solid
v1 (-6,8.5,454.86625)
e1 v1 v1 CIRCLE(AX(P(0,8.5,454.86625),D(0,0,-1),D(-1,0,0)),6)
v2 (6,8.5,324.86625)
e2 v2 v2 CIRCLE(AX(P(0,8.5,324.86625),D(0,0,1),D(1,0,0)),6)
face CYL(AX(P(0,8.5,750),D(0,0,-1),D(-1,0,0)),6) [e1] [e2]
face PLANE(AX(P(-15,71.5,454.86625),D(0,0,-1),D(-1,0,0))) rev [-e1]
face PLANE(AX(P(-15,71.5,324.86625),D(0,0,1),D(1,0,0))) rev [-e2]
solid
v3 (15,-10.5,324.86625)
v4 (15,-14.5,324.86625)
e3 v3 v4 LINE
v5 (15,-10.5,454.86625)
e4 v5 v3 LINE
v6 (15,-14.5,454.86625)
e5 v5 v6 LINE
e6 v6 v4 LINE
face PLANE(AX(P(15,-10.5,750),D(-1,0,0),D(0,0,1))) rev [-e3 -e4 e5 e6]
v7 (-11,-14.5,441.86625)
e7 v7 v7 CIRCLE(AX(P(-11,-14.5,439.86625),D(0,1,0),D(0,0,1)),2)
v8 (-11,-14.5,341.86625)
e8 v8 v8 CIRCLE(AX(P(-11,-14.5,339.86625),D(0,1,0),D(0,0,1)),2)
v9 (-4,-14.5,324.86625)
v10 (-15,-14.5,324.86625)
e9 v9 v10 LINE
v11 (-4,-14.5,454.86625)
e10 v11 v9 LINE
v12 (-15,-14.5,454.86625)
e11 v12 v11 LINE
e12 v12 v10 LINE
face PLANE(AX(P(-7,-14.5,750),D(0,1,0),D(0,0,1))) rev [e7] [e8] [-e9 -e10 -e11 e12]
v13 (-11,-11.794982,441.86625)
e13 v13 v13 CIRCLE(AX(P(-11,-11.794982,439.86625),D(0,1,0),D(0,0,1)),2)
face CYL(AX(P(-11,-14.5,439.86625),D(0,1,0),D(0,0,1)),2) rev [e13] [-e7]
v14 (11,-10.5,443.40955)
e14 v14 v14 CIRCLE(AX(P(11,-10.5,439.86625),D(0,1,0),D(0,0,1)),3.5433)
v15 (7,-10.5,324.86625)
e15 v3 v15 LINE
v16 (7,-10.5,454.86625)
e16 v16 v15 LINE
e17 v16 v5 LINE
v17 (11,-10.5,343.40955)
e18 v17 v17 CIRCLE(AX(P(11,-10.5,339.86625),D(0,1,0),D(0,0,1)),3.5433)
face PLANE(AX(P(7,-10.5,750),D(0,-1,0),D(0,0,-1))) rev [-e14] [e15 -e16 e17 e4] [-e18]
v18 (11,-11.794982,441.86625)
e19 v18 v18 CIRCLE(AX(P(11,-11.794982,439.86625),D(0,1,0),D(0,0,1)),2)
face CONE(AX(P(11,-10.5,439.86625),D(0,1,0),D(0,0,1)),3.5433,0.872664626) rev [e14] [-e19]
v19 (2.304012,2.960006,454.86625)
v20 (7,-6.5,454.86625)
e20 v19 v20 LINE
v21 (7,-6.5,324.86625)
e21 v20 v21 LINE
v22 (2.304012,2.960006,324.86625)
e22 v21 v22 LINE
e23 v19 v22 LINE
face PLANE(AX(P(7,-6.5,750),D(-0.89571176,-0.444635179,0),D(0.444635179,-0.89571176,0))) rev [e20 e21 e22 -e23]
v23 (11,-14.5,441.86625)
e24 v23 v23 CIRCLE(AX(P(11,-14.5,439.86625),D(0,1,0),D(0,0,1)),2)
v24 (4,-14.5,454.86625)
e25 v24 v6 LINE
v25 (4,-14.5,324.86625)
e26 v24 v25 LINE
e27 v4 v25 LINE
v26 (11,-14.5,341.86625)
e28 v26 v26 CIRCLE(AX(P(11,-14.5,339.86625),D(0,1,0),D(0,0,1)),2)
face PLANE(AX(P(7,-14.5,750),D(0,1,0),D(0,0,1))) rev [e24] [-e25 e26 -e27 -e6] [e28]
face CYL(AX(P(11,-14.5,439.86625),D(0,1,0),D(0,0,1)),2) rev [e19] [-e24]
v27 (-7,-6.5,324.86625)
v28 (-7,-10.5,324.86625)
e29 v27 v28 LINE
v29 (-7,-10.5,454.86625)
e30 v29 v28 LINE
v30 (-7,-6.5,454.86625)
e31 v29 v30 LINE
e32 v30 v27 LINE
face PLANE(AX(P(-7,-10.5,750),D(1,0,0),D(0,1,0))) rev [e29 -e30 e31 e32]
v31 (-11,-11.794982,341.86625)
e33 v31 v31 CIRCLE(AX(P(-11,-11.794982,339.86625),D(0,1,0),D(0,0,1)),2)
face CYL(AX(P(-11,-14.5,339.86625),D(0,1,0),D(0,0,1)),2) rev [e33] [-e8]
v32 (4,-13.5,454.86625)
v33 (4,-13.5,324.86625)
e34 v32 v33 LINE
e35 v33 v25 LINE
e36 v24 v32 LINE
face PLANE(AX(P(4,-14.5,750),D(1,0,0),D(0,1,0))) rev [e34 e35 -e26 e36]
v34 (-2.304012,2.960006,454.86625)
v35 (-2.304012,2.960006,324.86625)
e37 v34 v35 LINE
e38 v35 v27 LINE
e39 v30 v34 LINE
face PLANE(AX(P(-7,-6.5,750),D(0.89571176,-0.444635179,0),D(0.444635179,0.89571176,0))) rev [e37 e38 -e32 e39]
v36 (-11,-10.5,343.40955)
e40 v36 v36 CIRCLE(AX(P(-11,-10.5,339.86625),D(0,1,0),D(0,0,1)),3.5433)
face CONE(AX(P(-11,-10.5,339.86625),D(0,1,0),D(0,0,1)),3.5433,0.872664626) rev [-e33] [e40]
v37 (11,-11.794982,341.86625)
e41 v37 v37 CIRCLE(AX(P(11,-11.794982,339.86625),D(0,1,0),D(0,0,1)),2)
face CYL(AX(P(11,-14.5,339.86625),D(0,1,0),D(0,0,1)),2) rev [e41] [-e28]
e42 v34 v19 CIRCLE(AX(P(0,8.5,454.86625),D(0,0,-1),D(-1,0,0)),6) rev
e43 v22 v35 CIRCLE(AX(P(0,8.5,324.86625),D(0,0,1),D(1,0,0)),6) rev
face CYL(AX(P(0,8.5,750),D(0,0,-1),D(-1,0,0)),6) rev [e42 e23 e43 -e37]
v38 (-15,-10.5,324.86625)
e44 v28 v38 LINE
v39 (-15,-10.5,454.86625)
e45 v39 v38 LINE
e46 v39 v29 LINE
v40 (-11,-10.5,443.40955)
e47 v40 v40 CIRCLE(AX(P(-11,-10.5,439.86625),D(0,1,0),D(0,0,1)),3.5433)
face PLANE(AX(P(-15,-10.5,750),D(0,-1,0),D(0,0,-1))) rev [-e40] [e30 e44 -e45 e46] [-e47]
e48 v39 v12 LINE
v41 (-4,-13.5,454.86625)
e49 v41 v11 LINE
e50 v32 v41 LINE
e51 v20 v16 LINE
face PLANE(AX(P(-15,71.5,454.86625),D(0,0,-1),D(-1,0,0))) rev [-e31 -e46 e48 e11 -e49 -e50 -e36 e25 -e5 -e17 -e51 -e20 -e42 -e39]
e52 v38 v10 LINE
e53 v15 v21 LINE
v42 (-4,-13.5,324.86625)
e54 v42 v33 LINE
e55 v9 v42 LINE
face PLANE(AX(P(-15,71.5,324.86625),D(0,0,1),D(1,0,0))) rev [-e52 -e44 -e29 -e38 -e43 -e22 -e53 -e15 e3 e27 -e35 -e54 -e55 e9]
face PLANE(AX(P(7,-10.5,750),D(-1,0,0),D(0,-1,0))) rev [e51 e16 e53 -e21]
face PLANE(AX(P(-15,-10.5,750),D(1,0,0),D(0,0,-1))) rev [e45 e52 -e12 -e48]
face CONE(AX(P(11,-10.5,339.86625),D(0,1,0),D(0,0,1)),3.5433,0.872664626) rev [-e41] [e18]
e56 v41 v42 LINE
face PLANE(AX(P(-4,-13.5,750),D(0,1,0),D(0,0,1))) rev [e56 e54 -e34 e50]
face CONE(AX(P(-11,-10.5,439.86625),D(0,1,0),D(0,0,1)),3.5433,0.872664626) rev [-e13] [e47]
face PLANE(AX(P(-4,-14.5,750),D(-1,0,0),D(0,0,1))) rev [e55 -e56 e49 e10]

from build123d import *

# Parameters (mm, degrees)
RAILBASE_DEPTH     = 750
SKETCH3_R          = 6
RAIL_DEPTH         = 750
CUT_EXTRUDE1_START = -4
SKETCH4_R          = 2
CUT_EXTRUDE1_DEPTH = 4
SKETCH11_W         = 30
SKETCH11_H         = 324.866250412
SKETCH11_H_2       = 295.133749588
CUT_EXTRUDE2_DEPTH = 86


# Read off the part's stored shape, not the designer's step: AdvancedHole5
with BuildPart() as part:
    # Sketch2 → RailBase (new body)
    with BuildSketch(Plane.XY):
        with BuildLine():
            Line((7, -14.5), (15, -14.5))
            Line((15, -14.5), (15, -10.5))
            Line((15, -10.5), (7, -10.5))
            Line((7, -10.5), (7, -6.5))
            Line((7, -6.5), (2.30401202, 2.960006443))
            ThreePointArc((2.30401202, 2.960006443), (0, 2.5), (-2.30401202, 2.960006443))
            Line((-2.30401202, 2.960006443), (-7, -6.5))
            Line((-7, -6.5), (-7, -10.5))
            Line((-7, -10.5), (-15, -10.5))
            Line((-15, -10.5), (-15, -14.5))
            Line((-15, -14.5), (-7, -14.5))
            Line((-7, -14.5), (-4, -14.5))
            Line((-4, -14.5), (-4, -13.5))
            Line((-4, -13.5), (4, -13.5))
            Line((4, -13.5), (4, -14.5))
            Line((4, -14.5), (7, -14.5))
        make_face()
    extrude(amount=RAILBASE_DEPTH)

    # Sketch4 → Cut-Extrude1 (cut)
    with BuildSketch(Plane(origin=(0, -10.5, 0), x_dir=(1, 0, 0), z_dir=(0, 1, 0)).offset(CUT_EXTRUDE1_START)):
        with Locations(Location((11, -739.866250412, 0), (0, 0, 270))):
            Circle(SKETCH4_R)
        with Locations(Location((-11, -739.866250412, 0), (0, 0, 270))):
            Circle(SKETCH4_R)
        with Locations(Location((-11, -639.866250412, 0), (0, 0, 270))):
            Circle(SKETCH4_R)
        with Locations(Location((-11, -539.866250412, 0), (0, 0, 270))):
            Circle(SKETCH4_R)
        with Locations(Location((-11, -439.866250412, 0), (0, 0, 270))):
            Circle(SKETCH4_R)
        with Locations(Location((-11, -339.866250412, 0), (0, 0, 270))):
            Circle(SKETCH4_R)
        with Locations(Location((-11, -239.866250412, 0), (0, 0, 270))):
            Circle(SKETCH4_R)
        with Locations(Location((-11, -139.866250412, 0), (0, 0, 270))):
            Circle(SKETCH4_R)
        with Locations(Location((-11, -39.866250412, 0), (0, 0, 270))):
            Circle(SKETCH4_R)
        with Locations(Location((11, -639.866250412, 0), (0, 0, 270))):
            Circle(SKETCH4_R)
        with Locations(Location((11, -539.866250412, 0), (0, 0, 270))):
            Circle(SKETCH4_R)
        with Locations(Location((11, -439.866250412, 0), (0, 0, 270))):
            Circle(SKETCH4_R)
        with Locations(Location((11, -339.866250412, 0), (0, 0, 270))):
            Circle(SKETCH4_R)
        with Locations(Location((11, -239.866250412, 0), (0, 0, 270))):
            Circle(SKETCH4_R)
        with Locations(Location((11, -139.866250412, 0), (0, 0, 270))):
            Circle(SKETCH4_R)
        with Locations(Location((11, -39.866250412, 0), (0, 0, 270))):
            Circle(SKETCH4_R)
    extrude(amount=CUT_EXTRUDE1_DEPTH, mode=Mode.SUBTRACT)

    # AdvancedHole5 outline → AdvancedHole5 (revolve, cut)
    with BuildSketch(Plane(origin=(-11, 0, 39.866250412), x_dir=(1, 0, 0), z_dir=(0, 0, 1))):
        Polygon((2, -10.5), (2, -11.794982461), (3.5433, -10.5), align=None)
    revolve(axis=Axis((-11, 0, 39.866250412), (0, 1, 0)), mode=Mode.SUBTRACT)

    # AdvancedHole5 2 outline → AdvancedHole5 2 (revolve, cut)
    with BuildSketch(Plane(origin=(11, 0, 39.866250412), x_dir=(1, 0, 0), z_dir=(0, 0, 1))):
        Polygon((2, -10.5), (2, -11.794982461), (3.5433, -10.5), align=None)
    revolve(axis=Axis((11, 0, 39.866250412), (0, 1, 0)), mode=Mode.SUBTRACT)

    # AdvancedHole5 3 outline → AdvancedHole5 3 (revolve, cut)
    with BuildSketch(Plane(origin=(-11, 0, 139.866250412), x_dir=(1, 0, 0), z_dir=(0, 0, 1))):
        Polygon((2, -10.5), (2, -11.794982461), (3.5433, -10.5), align=None)
    revolve(axis=Axis((-11, 0, 139.866250412), (0, 1, 0)), mode=Mode.SUBTRACT)

    # AdvancedHole5 4 outline → AdvancedHole5 4 (revolve, cut)
    with BuildSketch(Plane(origin=(11, 0, 139.866250412), x_dir=(1, 0, 0), z_dir=(0, 0, 1))):
        Polygon((2, -10.5), (2, -11.794982461), (3.5433, -10.5), align=None)
    revolve(axis=Axis((11, 0, 139.866250412), (0, 1, 0)), mode=Mode.SUBTRACT)

    # AdvancedHole5 5 outline → AdvancedHole5 5 (revolve, cut)
    with BuildSketch(Plane(origin=(-11, 0, 239.866250412), x_dir=(1, 0, 0), z_dir=(0, 0, 1))):
        Polygon((2, -10.5), (2, -11.794982461), (3.5433, -10.5), align=None)
    revolve(axis=Axis((-11, 0, 239.866250412), (0, 1, 0)), mode=Mode.SUBTRACT)

    # AdvancedHole5 6 outline → AdvancedHole5 6 (revolve, cut)
    with BuildSketch(Plane(origin=(11, 0, 239.866250412), x_dir=(1, 0, 0), z_dir=(0, 0, 1))):
        Polygon((2, -10.5), (2, -11.794982461), (3.5433, -10.5), align=None)
    revolve(axis=Axis((11, 0, 239.866250412), (0, 1, 0)), mode=Mode.SUBTRACT)

    # AdvancedHole5 7 outline → AdvancedHole5 7 (revolve, cut)
    with BuildSketch(Plane(origin=(11, 0, 339.866250412), x_dir=(1, 0, 0), z_dir=(0, 0, 1))):
        Polygon((2, -10.5), (2, -11.794982461), (3.5433, -10.5), align=None)
    revolve(axis=Axis((11, 0, 339.866250412), (0, 1, 0)), mode=Mode.SUBTRACT)

    # AdvancedHole5 8 outline → AdvancedHole5 8 (revolve, cut)
    with BuildSketch(Plane(origin=(-11, 0, 339.866250412), x_dir=(1, 0, 0), z_dir=(0, 0, 1))):
        Polygon((2, -10.5), (2, -11.794982461), (3.5433, -10.5), align=None)
    revolve(axis=Axis((-11, 0, 339.866250412), (0, 1, 0)), mode=Mode.SUBTRACT)

    # AdvancedHole5 9 outline → AdvancedHole5 9 (revolve, cut)
    with BuildSketch(Plane(origin=(11, 0, 439.866250412), x_dir=(1, 0, 0), z_dir=(0, 0, 1))):
        Polygon((2, -10.5), (2, -11.794982461), (3.5433, -10.5), align=None)
    revolve(axis=Axis((11, 0, 439.866250412), (0, 1, 0)), mode=Mode.SUBTRACT)

    # AdvancedHole5 10 outline → AdvancedHole5 10 (revolve, cut)
    with BuildSketch(Plane(origin=(-11, 0, 439.866250412), x_dir=(1, 0, 0), z_dir=(0, 0, 1))):
        Polygon((2, -10.5), (2, -11.794982461), (3.5433, -10.5), align=None)
    revolve(axis=Axis((-11, 0, 439.866250412), (0, 1, 0)), mode=Mode.SUBTRACT)

    # AdvancedHole5 11 outline → AdvancedHole5 11 (revolve, cut)
    with BuildSketch(Plane(origin=(-11, 0, 539.866250412), x_dir=(1, 0, 0), z_dir=(0, 0, 1))):
        Polygon((2, -10.5), (2, -11.794982461), (3.5433, -10.5), align=None)
    revolve(axis=Axis((-11, 0, 539.866250412), (0, 1, 0)), mode=Mode.SUBTRACT)

    # AdvancedHole5 12 outline → AdvancedHole5 12 (revolve, cut)
    with BuildSketch(Plane(origin=(11, 0, 539.866250412), x_dir=(1, 0, 0), z_dir=(0, 0, 1))):
        Polygon((2, -10.5), (2, -11.794982461), (3.5433, -10.5), align=None)
    revolve(axis=Axis((11, 0, 539.866250412), (0, 1, 0)), mode=Mode.SUBTRACT)

    # AdvancedHole5 13 outline → AdvancedHole5 13 (revolve, cut)
    with BuildSketch(Plane(origin=(-11, 0, 639.866250412), x_dir=(1, 0, 0), z_dir=(0, 0, 1))):
        Polygon((2, -10.5), (2, -11.794982461), (3.5433, -10.5), align=None)
    revolve(axis=Axis((-11, 0, 639.866250412), (0, 1, 0)), mode=Mode.SUBTRACT)

    # AdvancedHole5 14 outline → AdvancedHole5 14 (revolve, cut)
    with BuildSketch(Plane(origin=(11, 0, 639.866250412), x_dir=(1, 0, 0), z_dir=(0, 0, 1))):
        Polygon((2, -10.5), (2, -11.794982461), (3.5433, -10.5), align=None)
    revolve(axis=Axis((11, 0, 639.866250412), (0, 1, 0)), mode=Mode.SUBTRACT)

    # AdvancedHole5 15 outline → AdvancedHole5 15 (revolve, cut)
    with BuildSketch(Plane(origin=(11, 0, 739.866250412), x_dir=(1, 0, 0), z_dir=(0, 0, 1))):
        Polygon((2, -10.5), (2, -11.794982461), (3.5433, -10.5), align=None)
    revolve(axis=Axis((11, 0, 739.866250412), (0, 1, 0)), mode=Mode.SUBTRACT)

    # AdvancedHole5 16 outline → AdvancedHole5 16 (revolve, cut)
    with BuildSketch(Plane(origin=(-11, 0, 739.866250412), x_dir=(1, 0, 0), z_dir=(0, 0, 1))):
        Polygon((2, -10.5), (2, -11.794982461), (3.5433, -10.5), align=None)
    revolve(axis=Axis((-11, 0, 739.866250412), (0, 1, 0)), mode=Mode.SUBTRACT)


with BuildPart() as body_2:
    # Sketch3 → Rail (new body)
    with BuildSketch(Plane.XY):
        with Locations((0, 8.5)):
            Circle(SKETCH3_R)
    extrude(amount=RAIL_DEPTH)


with BuildPart() as cut_extrude2_tool:
    # Sketch11 → Cut-Extrude2 (new body)
    with BuildSketch(Plane.XZ.offset(14.5)):
        with Locations((0, 162.433125206)):
            Rectangle(SKETCH11_W, SKETCH11_H)
        with Locations((0, 602.433125206)):
            Rectangle(SKETCH11_W, SKETCH11_H_2)
    extrude(amount=-CUT_EXTRUDE2_DEPTH)


with BuildPart() as part_1:
    add(part.part)

    # Cut-Extrude2: cut by cut_extrude2_tool
    add(cut_extrude2_tool.part, mode=Mode.SUBTRACT)


with BuildPart() as body_2_1:
    add(body_2.part)

    # Cut-Extrude2: cut by cut_extrude2_tool
    add(cut_extrude2_tool.part, mode=Mode.SUBTRACT)


solid = Compound([part_1.part, body_2_1.part])
